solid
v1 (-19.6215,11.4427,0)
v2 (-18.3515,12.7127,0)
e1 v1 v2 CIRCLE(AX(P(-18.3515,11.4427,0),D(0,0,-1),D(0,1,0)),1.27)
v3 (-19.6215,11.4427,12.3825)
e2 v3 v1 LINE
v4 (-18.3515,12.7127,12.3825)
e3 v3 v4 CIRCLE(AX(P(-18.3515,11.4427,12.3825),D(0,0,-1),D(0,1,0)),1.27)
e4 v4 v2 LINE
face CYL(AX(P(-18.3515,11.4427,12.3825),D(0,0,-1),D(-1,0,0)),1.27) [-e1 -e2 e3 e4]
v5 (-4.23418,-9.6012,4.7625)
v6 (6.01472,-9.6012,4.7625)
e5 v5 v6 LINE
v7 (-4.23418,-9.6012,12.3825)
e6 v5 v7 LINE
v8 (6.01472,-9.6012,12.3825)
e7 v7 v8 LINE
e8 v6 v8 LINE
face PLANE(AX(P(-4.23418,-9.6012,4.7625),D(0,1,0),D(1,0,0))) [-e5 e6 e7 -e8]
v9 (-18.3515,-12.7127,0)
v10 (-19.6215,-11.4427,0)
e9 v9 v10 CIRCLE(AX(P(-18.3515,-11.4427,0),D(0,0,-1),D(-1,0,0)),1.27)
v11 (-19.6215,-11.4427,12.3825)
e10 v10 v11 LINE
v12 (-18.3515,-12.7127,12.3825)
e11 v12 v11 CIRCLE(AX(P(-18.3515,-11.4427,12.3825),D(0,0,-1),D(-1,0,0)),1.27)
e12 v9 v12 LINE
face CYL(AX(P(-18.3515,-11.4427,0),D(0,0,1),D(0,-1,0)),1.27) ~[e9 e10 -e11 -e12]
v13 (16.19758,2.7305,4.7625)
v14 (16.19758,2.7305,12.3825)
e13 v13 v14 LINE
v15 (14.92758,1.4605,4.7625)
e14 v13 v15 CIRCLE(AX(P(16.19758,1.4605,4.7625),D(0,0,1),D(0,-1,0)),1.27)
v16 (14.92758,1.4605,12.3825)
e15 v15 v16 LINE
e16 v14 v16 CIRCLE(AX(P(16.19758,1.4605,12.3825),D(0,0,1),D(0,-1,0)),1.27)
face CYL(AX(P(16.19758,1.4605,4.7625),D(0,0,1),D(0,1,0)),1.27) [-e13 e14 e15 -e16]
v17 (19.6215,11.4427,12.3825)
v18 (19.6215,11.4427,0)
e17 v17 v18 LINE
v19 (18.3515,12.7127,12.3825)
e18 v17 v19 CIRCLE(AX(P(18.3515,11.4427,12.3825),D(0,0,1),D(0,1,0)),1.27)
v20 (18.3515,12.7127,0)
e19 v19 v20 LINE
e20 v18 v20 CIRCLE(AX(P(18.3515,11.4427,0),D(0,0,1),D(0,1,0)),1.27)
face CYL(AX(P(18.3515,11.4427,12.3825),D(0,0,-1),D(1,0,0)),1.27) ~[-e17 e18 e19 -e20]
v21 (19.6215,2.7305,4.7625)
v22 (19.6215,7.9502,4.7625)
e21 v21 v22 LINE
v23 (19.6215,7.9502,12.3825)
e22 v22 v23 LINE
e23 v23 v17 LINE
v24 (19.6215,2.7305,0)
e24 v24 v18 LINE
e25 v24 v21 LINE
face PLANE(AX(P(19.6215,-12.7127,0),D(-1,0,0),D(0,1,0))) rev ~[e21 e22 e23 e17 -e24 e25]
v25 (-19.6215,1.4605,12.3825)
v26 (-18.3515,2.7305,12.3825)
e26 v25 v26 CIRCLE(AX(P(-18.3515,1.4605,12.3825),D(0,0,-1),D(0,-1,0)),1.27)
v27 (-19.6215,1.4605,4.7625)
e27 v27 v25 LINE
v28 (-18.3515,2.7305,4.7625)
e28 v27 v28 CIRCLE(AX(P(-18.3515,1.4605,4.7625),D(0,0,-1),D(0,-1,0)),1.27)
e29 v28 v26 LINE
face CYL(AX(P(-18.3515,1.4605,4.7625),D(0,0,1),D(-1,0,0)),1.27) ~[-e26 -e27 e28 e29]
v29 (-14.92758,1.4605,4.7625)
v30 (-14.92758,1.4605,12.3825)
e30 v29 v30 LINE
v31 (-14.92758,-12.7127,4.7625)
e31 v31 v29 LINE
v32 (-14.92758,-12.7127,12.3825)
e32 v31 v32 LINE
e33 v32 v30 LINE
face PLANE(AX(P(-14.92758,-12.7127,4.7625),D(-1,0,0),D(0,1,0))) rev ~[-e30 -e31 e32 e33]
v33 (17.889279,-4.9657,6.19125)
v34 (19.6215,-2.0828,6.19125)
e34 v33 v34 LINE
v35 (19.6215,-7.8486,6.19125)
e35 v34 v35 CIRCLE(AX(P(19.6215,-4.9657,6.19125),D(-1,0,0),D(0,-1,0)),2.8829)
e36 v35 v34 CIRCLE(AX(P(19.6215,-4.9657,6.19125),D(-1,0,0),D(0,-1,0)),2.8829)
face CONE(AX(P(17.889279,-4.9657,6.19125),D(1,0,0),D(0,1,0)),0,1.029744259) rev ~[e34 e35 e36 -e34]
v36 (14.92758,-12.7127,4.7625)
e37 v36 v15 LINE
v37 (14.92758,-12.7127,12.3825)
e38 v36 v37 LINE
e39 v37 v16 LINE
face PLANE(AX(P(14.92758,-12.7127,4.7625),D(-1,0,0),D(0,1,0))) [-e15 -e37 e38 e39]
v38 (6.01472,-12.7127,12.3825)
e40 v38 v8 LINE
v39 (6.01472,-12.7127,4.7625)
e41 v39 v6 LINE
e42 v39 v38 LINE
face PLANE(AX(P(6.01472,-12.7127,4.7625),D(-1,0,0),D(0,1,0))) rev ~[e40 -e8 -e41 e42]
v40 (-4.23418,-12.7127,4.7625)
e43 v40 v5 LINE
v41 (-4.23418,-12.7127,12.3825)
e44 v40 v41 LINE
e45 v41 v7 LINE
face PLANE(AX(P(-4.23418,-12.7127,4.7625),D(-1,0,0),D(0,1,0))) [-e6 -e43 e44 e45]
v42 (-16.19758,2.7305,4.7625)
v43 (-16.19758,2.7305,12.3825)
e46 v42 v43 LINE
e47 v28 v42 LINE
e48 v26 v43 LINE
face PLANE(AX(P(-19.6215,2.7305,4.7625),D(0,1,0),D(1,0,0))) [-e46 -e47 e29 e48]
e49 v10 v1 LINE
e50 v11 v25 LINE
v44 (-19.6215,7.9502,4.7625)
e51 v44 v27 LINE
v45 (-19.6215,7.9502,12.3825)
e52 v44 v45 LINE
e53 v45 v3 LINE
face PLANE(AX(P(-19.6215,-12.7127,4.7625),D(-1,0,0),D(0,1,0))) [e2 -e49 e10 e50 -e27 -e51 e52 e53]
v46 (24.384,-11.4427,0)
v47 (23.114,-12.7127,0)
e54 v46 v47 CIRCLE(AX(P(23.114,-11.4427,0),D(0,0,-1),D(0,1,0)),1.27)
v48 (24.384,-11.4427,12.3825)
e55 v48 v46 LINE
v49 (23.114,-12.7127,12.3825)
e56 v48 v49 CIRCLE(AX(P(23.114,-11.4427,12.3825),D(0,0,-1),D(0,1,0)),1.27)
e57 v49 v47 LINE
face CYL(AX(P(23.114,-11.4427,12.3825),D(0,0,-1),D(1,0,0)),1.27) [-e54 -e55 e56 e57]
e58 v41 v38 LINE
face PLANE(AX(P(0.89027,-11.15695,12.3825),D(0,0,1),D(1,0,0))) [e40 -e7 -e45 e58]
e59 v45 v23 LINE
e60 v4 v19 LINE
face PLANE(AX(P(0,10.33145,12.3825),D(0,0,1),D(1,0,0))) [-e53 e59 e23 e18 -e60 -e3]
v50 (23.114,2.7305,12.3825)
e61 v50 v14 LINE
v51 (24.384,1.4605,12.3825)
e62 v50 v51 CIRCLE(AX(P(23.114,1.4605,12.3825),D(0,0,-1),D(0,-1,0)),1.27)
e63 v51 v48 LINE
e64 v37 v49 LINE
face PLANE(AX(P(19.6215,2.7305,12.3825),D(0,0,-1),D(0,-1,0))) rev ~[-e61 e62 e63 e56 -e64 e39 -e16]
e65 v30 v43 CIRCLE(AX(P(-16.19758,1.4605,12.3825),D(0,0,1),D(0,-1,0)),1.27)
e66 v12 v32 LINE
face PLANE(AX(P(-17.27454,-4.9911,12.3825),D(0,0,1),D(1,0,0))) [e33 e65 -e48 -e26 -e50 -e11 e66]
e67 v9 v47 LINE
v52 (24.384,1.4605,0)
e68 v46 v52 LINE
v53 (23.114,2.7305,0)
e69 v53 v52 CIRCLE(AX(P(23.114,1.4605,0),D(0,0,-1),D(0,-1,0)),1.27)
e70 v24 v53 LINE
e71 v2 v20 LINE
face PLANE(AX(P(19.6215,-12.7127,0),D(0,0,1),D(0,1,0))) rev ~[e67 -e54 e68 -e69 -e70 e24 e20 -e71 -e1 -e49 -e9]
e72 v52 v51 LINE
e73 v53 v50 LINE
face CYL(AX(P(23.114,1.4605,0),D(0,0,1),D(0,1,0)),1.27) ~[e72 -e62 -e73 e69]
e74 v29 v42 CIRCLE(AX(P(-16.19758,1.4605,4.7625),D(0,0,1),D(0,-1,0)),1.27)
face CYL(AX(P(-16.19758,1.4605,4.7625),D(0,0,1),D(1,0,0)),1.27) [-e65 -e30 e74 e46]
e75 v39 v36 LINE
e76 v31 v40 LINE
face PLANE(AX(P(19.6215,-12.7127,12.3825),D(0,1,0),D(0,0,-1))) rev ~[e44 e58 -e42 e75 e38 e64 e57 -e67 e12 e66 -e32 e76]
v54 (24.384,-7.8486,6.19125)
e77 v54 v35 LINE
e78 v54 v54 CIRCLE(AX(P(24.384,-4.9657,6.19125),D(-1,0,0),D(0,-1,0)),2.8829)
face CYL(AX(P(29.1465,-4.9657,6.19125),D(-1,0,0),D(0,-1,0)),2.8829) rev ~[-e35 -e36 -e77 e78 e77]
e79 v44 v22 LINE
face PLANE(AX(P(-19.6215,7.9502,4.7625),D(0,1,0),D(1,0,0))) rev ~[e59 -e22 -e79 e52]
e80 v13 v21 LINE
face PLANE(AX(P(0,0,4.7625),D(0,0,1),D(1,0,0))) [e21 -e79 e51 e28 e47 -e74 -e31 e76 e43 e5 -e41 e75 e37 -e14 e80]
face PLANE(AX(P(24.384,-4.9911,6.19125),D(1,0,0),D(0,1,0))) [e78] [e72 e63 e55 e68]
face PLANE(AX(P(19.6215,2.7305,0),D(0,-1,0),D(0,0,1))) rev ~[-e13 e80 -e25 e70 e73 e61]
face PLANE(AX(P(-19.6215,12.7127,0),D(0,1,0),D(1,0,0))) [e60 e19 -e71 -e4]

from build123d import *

# Parameters (mm, degrees)
F0_W     = 39.243
F0_H     = 25.4254
F1_DEPTH = 4.7625
F2_W     = 4.69392
F2_H     = 15.4432
F2_W_2   = 10.2489
F2_H_2   = 3.1115
F2_W_3   = 39.243
F2_H_3   = 4.7625
F3_DEPTH = 7.62
F5_DEPTH = 4.7625
F7_D     = 5.7658
F7_DEPTH = 4.7625
F7_TIP   = 1.7322210786
F8_R     = 1.27


# Not quite as in the source:
# - a length typed as a fraction of an inch, garbled in the dataset ("3 / 203.2 mm" for 3/8 in), is restored


with BuildPart() as f1:
    # F0 (on Top) → F1 (new body)
    with BuildSketch(Plane.XY):
        Rectangle(F0_W, F0_H)
    extrude(amount=F1_DEPTH)

    # F2 (on face) → F3 (join)
    with BuildSketch(Plane.XY.offset(4.7625)):
        with Locations((-17.27454, -4.9911)):
            Rectangle(F2_W, F2_H)
        with Locations((17.27454, -4.9911)):
            Rectangle(F2_W, F2_H)
        with Locations((0.89027, -11.15695)):
            Rectangle(F2_W_2, F2_H_2)
        with Locations((0, 10.33145)):
            Rectangle(F2_W_3, F2_H_3)
    extrude(amount=F3_DEPTH)

    # F4 (on face) → F5 (join)
    with BuildSketch(Plane.YZ.offset(19.6215)):
        Polygon((2.7305, 4.7625), (2.7305, 12.3825), (-12.7127, 12.3825), (-12.7127, 0), (2.7305, 0), align=None)
    extrude(amount=F5_DEPTH)

    # F7
    with Locations(Plane.YZ.offset(24.384)):
        with Locations((-4.9657, 6.19125)):
            Hole(F7_D / 2, depth=F7_DEPTH)
            with Locations((0, 0, -(F7_DEPTH + F7_TIP / 2))):  # 118° drill point
                Cone(0, F7_D / 2, F7_TIP, mode=Mode.SUBTRACT)

    # F8
    f8_edges = [f1.edges().sort_by_distance(p)[0] for p in [
        (-14.92758, 2.7305, 8.5725),
        (14.92758, 2.7305, 8.5725),
        (-19.6215, -12.7127, 6.19125),
        (24.384, -12.7127, 6.19125),
        (24.384, 2.7305, 6.19125),
        (19.6215, 12.7127, 6.19125),
        (-19.6215, 12.7127, 6.19125),
        (-19.6215, 2.7305, 8.5725),
    ]]
    fillet(f8_edges, radius=F8_R)


solid = f1.part
